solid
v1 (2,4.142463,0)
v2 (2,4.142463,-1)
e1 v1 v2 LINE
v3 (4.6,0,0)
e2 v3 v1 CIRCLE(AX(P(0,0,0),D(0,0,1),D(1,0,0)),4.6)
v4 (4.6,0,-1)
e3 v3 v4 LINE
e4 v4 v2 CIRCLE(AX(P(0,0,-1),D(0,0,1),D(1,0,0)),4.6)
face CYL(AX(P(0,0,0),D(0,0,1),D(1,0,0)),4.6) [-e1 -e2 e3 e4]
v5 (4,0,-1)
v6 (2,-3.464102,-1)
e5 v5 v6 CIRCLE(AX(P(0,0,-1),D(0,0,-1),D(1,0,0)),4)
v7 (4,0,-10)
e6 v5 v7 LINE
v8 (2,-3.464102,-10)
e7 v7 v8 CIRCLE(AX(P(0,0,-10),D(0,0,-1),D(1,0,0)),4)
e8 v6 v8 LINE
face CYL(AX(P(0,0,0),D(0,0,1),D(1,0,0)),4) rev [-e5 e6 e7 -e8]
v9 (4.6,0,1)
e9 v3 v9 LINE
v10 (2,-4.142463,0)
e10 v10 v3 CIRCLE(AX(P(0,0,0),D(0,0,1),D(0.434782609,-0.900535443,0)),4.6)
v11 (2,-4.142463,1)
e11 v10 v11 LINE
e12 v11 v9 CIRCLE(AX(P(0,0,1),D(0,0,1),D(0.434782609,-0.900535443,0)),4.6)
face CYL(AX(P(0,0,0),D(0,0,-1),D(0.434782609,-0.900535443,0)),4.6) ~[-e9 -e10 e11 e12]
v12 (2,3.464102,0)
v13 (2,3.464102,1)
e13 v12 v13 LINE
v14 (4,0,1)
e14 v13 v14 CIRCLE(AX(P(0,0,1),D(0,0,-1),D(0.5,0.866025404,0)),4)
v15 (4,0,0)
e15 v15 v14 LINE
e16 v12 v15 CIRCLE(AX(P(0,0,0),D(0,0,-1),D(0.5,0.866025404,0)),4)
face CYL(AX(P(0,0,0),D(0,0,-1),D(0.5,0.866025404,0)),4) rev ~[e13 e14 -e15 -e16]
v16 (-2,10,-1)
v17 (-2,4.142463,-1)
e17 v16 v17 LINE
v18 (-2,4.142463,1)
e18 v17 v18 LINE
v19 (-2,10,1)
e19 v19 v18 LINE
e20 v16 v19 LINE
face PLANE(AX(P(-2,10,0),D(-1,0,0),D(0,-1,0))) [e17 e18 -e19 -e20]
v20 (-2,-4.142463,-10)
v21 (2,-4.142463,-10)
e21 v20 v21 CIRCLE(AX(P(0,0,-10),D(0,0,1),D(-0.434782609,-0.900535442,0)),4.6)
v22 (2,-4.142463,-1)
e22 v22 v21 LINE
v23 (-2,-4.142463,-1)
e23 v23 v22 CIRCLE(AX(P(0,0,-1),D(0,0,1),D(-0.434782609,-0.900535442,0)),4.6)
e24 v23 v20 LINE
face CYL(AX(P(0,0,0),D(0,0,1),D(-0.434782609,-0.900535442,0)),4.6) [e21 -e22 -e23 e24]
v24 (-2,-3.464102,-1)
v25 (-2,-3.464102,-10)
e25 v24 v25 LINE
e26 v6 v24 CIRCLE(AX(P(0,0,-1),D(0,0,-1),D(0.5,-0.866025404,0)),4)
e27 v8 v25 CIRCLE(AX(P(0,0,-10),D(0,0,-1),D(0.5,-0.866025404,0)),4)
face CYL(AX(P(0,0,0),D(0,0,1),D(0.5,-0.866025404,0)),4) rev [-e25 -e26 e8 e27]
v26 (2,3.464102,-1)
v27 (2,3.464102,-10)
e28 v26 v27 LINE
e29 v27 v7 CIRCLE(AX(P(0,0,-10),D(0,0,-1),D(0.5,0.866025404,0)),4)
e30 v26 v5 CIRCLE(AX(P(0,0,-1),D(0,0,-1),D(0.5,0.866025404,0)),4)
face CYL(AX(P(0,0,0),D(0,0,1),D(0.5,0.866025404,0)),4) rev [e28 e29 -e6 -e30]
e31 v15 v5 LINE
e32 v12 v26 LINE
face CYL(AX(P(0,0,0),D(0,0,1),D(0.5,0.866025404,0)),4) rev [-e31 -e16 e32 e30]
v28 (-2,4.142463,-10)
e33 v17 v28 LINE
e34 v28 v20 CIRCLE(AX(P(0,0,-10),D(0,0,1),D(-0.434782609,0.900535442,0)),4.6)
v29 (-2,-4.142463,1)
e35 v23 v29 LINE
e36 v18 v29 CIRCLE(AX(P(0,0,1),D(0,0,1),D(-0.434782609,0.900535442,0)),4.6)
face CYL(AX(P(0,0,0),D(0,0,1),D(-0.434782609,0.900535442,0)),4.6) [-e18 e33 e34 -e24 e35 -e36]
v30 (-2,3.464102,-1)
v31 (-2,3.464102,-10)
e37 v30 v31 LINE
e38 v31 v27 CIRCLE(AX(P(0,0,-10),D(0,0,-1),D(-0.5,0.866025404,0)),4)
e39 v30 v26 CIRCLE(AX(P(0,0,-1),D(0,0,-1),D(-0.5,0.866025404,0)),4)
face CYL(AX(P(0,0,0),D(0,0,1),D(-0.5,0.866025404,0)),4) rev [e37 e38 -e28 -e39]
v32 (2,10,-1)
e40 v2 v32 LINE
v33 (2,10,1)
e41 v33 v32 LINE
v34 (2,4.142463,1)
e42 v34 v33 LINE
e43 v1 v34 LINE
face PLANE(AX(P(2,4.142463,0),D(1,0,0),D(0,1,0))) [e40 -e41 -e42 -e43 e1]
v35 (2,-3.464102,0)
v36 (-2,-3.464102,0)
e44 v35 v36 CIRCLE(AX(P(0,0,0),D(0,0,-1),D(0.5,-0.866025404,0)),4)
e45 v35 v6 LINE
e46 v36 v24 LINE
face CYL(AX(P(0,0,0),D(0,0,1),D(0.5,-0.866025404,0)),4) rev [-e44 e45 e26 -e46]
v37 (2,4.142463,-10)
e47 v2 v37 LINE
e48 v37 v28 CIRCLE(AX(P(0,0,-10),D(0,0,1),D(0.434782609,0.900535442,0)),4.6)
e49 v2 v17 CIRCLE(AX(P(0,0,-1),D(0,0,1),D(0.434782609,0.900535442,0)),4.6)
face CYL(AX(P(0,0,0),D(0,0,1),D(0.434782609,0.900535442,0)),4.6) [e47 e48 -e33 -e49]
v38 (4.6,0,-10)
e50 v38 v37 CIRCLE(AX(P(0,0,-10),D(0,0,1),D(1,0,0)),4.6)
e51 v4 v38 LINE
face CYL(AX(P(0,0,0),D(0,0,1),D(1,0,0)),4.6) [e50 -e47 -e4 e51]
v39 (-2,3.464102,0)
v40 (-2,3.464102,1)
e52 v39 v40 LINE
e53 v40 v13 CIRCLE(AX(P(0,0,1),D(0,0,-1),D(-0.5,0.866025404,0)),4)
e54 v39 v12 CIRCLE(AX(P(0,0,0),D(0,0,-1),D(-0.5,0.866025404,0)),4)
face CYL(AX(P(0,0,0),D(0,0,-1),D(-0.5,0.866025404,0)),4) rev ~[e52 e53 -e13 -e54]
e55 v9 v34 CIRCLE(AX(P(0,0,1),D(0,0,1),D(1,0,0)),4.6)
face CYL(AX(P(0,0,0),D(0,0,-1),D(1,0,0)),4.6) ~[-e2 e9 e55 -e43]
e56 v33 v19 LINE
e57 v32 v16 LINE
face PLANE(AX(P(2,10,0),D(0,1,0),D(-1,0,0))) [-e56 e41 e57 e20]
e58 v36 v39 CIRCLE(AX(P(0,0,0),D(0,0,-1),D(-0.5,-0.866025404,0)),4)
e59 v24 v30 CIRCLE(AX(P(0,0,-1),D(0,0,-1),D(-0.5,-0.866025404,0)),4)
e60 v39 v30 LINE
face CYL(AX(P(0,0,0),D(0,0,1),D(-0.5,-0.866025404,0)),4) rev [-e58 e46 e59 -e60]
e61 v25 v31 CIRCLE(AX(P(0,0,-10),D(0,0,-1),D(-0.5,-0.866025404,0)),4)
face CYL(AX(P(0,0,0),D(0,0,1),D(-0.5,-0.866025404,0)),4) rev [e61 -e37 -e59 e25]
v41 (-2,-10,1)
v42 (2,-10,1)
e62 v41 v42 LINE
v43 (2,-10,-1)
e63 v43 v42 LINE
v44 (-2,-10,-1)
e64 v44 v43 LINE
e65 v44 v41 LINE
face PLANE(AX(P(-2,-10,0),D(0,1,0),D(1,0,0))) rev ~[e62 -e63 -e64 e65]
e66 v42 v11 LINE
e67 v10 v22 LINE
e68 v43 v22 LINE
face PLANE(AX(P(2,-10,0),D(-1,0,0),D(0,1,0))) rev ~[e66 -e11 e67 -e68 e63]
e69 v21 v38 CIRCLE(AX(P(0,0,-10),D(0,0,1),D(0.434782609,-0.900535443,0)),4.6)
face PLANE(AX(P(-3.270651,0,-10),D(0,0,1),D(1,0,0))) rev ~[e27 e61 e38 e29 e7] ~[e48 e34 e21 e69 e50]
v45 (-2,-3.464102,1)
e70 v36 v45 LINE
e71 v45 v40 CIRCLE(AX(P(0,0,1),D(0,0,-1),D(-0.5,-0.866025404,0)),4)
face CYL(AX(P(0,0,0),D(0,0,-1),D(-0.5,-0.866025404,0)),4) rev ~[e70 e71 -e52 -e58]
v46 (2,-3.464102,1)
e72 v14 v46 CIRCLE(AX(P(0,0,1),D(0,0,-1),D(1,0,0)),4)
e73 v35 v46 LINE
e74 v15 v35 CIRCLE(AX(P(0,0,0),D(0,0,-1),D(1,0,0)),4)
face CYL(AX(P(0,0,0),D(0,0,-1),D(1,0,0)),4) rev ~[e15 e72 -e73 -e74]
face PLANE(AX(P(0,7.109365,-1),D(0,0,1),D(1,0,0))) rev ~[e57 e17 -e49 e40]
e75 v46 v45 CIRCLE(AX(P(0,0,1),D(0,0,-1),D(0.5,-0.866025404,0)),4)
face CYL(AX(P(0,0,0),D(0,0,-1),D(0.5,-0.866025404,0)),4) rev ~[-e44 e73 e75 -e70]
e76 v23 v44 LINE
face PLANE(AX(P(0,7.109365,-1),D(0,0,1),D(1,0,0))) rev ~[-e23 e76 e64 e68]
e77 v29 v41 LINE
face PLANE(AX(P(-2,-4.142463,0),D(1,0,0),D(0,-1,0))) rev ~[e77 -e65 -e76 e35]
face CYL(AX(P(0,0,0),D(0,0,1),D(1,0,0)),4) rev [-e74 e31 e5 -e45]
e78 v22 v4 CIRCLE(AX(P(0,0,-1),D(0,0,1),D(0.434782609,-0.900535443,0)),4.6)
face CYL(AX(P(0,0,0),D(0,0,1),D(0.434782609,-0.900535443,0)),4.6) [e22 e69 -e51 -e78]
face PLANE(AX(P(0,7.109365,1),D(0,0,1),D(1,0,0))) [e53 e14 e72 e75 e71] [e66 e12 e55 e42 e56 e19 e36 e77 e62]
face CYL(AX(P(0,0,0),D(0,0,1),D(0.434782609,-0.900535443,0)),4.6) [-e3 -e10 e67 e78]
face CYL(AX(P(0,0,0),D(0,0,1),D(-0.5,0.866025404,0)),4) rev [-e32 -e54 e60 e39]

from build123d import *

# Parameters (mm, degrees)
F1_DEPTH = 10
F2_DEPTH = 1


# Not quite as in the source:
# - a feature names something its author has since deleted; it is built from what else it names


with BuildPart() as f1:
    # F0 (on Top) → F1 (new body)
    with BuildSketch(Plane.XY):
        with BuildLine():
            Line((-2, 3.4641016151), (-2, 4.1424630354))
            ThreePointArc((-2, 4.1424630354), (-4.6, 0), (-2, -4.1424630354))
            Line((-2, -4.1424630354), (-2, -3.4641016151))
            ThreePointArc((-2, -3.4641016151), (-4, 0), (-2, 3.4641016151))
        make_face()
        with BuildLine():
            ThreePointArc((-2, -4.1424630354), (0, -4.6), (2, -4.1424630354))
            Line((2, -4.1424630354), (2, -3.4641016151))
            ThreePointArc((2, -3.4641016151), (0, -4), (-2, -3.4641016151))
            Line((-2, -3.4641016151), (-2, -4.1424630354))
        make_face()
        with BuildLine():
            ThreePointArc((2, -4.1424630354), (3.8961519478, -2.4454038521), (4.6, 0))
            ThreePointArc((4.6, 0), (3.8961519478, 2.4454038521), (2, 4.1424630354))
            Line((2, 4.1424630354), (2, 3.4641016151))
            ThreePointArc((2, 3.4641016151), (3.4641016151, 2), (4, 0))
            ThreePointArc((4, 0), (3.4641016151, -2), (2, -3.4641016151))
            Line((2, -3.4641016151), (2, -4.1424630354))
        make_face()
        with BuildLine():
            Line((2, 3.4641016151), (2, 4.1424630354))
            ThreePointArc((2, 4.1424630354), (0, 4.6), (-2, 4.1424630354))
            Line((-2, 4.1424630354), (-2, 3.4641016151))
            ThreePointArc((-2, 3.4641016151), (0, 4), (2, 3.4641016151))
        make_face()
    extrude(amount=-F1_DEPTH)

    # F0 (on Top) → F2 (join, symmetric)
    with BuildSketch(Plane.XY):
        with BuildLine():
            ThreePointArc((-2, 4.1424630354), (0, 4.6), (2, 4.1424630354))
            Line((2, 4.1424630354), (2, 10))
            Line((2, 10), (-2, 10))
            Line((-2, 10), (-2, 4.1424630354))
        make_face()
        with BuildLine():
            Line((2, -10), (2, -4.1424630354))
            ThreePointArc((2, -4.1424630354), (0, -4.6), (-2, -4.1424630354))
            Line((-2, -4.1424630354), (-2, -10))
            Line((-2, -10), (2, -10))
        make_face()
        with BuildLine():
            Line((2, 3.4641016151), (2, 4.1424630354))
            ThreePointArc((2, 4.1424630354), (0, 4.6), (-2, 4.1424630354))
            Line((-2, 4.1424630354), (-2, 3.4641016151))
            ThreePointArc((-2, 3.4641016151), (0, 4), (2, 3.4641016151))
        make_face()
        with BuildLine():
            ThreePointArc((-2, -4.1424630354), (0, -4.6), (2, -4.1424630354))
            Line((2, -4.1424630354), (2, -3.4641016151))
            ThreePointArc((2, -3.4641016151), (0, -4), (-2, -3.4641016151))
            Line((-2, -3.4641016151), (-2, -4.1424630354))
        make_face()
        with BuildLine():
            Line((-2, 3.4641016151), (-2, 4.1424630354))
            ThreePointArc((-2, 4.1424630354), (-4.6, 0), (-2, -4.1424630354))
            Line((-2, -4.1424630354), (-2, -3.4641016151))
            ThreePointArc((-2, -3.4641016151), (-4, 0), (-2, 3.4641016151))
        make_face()
        with BuildLine():
            ThreePointArc((2, -4.1424630354), (3.8961519478, -2.4454038521), (4.6, 0))
            ThreePointArc((4.6, 0), (3.8961519478, 2.4454038521), (2, 4.1424630354))
            Line((2, 4.1424630354), (2, 3.4641016151))
            ThreePointArc((2, 3.4641016151), (3.4641016151, 2), (4, 0))
            ThreePointArc((4, 0), (3.4641016151, -2), (2, -3.4641016151))
            Line((2, -3.4641016151), (2, -4.1424630354))
        make_face()
    extrude(amount=F2_DEPTH, both=True)


solid = f1.part
